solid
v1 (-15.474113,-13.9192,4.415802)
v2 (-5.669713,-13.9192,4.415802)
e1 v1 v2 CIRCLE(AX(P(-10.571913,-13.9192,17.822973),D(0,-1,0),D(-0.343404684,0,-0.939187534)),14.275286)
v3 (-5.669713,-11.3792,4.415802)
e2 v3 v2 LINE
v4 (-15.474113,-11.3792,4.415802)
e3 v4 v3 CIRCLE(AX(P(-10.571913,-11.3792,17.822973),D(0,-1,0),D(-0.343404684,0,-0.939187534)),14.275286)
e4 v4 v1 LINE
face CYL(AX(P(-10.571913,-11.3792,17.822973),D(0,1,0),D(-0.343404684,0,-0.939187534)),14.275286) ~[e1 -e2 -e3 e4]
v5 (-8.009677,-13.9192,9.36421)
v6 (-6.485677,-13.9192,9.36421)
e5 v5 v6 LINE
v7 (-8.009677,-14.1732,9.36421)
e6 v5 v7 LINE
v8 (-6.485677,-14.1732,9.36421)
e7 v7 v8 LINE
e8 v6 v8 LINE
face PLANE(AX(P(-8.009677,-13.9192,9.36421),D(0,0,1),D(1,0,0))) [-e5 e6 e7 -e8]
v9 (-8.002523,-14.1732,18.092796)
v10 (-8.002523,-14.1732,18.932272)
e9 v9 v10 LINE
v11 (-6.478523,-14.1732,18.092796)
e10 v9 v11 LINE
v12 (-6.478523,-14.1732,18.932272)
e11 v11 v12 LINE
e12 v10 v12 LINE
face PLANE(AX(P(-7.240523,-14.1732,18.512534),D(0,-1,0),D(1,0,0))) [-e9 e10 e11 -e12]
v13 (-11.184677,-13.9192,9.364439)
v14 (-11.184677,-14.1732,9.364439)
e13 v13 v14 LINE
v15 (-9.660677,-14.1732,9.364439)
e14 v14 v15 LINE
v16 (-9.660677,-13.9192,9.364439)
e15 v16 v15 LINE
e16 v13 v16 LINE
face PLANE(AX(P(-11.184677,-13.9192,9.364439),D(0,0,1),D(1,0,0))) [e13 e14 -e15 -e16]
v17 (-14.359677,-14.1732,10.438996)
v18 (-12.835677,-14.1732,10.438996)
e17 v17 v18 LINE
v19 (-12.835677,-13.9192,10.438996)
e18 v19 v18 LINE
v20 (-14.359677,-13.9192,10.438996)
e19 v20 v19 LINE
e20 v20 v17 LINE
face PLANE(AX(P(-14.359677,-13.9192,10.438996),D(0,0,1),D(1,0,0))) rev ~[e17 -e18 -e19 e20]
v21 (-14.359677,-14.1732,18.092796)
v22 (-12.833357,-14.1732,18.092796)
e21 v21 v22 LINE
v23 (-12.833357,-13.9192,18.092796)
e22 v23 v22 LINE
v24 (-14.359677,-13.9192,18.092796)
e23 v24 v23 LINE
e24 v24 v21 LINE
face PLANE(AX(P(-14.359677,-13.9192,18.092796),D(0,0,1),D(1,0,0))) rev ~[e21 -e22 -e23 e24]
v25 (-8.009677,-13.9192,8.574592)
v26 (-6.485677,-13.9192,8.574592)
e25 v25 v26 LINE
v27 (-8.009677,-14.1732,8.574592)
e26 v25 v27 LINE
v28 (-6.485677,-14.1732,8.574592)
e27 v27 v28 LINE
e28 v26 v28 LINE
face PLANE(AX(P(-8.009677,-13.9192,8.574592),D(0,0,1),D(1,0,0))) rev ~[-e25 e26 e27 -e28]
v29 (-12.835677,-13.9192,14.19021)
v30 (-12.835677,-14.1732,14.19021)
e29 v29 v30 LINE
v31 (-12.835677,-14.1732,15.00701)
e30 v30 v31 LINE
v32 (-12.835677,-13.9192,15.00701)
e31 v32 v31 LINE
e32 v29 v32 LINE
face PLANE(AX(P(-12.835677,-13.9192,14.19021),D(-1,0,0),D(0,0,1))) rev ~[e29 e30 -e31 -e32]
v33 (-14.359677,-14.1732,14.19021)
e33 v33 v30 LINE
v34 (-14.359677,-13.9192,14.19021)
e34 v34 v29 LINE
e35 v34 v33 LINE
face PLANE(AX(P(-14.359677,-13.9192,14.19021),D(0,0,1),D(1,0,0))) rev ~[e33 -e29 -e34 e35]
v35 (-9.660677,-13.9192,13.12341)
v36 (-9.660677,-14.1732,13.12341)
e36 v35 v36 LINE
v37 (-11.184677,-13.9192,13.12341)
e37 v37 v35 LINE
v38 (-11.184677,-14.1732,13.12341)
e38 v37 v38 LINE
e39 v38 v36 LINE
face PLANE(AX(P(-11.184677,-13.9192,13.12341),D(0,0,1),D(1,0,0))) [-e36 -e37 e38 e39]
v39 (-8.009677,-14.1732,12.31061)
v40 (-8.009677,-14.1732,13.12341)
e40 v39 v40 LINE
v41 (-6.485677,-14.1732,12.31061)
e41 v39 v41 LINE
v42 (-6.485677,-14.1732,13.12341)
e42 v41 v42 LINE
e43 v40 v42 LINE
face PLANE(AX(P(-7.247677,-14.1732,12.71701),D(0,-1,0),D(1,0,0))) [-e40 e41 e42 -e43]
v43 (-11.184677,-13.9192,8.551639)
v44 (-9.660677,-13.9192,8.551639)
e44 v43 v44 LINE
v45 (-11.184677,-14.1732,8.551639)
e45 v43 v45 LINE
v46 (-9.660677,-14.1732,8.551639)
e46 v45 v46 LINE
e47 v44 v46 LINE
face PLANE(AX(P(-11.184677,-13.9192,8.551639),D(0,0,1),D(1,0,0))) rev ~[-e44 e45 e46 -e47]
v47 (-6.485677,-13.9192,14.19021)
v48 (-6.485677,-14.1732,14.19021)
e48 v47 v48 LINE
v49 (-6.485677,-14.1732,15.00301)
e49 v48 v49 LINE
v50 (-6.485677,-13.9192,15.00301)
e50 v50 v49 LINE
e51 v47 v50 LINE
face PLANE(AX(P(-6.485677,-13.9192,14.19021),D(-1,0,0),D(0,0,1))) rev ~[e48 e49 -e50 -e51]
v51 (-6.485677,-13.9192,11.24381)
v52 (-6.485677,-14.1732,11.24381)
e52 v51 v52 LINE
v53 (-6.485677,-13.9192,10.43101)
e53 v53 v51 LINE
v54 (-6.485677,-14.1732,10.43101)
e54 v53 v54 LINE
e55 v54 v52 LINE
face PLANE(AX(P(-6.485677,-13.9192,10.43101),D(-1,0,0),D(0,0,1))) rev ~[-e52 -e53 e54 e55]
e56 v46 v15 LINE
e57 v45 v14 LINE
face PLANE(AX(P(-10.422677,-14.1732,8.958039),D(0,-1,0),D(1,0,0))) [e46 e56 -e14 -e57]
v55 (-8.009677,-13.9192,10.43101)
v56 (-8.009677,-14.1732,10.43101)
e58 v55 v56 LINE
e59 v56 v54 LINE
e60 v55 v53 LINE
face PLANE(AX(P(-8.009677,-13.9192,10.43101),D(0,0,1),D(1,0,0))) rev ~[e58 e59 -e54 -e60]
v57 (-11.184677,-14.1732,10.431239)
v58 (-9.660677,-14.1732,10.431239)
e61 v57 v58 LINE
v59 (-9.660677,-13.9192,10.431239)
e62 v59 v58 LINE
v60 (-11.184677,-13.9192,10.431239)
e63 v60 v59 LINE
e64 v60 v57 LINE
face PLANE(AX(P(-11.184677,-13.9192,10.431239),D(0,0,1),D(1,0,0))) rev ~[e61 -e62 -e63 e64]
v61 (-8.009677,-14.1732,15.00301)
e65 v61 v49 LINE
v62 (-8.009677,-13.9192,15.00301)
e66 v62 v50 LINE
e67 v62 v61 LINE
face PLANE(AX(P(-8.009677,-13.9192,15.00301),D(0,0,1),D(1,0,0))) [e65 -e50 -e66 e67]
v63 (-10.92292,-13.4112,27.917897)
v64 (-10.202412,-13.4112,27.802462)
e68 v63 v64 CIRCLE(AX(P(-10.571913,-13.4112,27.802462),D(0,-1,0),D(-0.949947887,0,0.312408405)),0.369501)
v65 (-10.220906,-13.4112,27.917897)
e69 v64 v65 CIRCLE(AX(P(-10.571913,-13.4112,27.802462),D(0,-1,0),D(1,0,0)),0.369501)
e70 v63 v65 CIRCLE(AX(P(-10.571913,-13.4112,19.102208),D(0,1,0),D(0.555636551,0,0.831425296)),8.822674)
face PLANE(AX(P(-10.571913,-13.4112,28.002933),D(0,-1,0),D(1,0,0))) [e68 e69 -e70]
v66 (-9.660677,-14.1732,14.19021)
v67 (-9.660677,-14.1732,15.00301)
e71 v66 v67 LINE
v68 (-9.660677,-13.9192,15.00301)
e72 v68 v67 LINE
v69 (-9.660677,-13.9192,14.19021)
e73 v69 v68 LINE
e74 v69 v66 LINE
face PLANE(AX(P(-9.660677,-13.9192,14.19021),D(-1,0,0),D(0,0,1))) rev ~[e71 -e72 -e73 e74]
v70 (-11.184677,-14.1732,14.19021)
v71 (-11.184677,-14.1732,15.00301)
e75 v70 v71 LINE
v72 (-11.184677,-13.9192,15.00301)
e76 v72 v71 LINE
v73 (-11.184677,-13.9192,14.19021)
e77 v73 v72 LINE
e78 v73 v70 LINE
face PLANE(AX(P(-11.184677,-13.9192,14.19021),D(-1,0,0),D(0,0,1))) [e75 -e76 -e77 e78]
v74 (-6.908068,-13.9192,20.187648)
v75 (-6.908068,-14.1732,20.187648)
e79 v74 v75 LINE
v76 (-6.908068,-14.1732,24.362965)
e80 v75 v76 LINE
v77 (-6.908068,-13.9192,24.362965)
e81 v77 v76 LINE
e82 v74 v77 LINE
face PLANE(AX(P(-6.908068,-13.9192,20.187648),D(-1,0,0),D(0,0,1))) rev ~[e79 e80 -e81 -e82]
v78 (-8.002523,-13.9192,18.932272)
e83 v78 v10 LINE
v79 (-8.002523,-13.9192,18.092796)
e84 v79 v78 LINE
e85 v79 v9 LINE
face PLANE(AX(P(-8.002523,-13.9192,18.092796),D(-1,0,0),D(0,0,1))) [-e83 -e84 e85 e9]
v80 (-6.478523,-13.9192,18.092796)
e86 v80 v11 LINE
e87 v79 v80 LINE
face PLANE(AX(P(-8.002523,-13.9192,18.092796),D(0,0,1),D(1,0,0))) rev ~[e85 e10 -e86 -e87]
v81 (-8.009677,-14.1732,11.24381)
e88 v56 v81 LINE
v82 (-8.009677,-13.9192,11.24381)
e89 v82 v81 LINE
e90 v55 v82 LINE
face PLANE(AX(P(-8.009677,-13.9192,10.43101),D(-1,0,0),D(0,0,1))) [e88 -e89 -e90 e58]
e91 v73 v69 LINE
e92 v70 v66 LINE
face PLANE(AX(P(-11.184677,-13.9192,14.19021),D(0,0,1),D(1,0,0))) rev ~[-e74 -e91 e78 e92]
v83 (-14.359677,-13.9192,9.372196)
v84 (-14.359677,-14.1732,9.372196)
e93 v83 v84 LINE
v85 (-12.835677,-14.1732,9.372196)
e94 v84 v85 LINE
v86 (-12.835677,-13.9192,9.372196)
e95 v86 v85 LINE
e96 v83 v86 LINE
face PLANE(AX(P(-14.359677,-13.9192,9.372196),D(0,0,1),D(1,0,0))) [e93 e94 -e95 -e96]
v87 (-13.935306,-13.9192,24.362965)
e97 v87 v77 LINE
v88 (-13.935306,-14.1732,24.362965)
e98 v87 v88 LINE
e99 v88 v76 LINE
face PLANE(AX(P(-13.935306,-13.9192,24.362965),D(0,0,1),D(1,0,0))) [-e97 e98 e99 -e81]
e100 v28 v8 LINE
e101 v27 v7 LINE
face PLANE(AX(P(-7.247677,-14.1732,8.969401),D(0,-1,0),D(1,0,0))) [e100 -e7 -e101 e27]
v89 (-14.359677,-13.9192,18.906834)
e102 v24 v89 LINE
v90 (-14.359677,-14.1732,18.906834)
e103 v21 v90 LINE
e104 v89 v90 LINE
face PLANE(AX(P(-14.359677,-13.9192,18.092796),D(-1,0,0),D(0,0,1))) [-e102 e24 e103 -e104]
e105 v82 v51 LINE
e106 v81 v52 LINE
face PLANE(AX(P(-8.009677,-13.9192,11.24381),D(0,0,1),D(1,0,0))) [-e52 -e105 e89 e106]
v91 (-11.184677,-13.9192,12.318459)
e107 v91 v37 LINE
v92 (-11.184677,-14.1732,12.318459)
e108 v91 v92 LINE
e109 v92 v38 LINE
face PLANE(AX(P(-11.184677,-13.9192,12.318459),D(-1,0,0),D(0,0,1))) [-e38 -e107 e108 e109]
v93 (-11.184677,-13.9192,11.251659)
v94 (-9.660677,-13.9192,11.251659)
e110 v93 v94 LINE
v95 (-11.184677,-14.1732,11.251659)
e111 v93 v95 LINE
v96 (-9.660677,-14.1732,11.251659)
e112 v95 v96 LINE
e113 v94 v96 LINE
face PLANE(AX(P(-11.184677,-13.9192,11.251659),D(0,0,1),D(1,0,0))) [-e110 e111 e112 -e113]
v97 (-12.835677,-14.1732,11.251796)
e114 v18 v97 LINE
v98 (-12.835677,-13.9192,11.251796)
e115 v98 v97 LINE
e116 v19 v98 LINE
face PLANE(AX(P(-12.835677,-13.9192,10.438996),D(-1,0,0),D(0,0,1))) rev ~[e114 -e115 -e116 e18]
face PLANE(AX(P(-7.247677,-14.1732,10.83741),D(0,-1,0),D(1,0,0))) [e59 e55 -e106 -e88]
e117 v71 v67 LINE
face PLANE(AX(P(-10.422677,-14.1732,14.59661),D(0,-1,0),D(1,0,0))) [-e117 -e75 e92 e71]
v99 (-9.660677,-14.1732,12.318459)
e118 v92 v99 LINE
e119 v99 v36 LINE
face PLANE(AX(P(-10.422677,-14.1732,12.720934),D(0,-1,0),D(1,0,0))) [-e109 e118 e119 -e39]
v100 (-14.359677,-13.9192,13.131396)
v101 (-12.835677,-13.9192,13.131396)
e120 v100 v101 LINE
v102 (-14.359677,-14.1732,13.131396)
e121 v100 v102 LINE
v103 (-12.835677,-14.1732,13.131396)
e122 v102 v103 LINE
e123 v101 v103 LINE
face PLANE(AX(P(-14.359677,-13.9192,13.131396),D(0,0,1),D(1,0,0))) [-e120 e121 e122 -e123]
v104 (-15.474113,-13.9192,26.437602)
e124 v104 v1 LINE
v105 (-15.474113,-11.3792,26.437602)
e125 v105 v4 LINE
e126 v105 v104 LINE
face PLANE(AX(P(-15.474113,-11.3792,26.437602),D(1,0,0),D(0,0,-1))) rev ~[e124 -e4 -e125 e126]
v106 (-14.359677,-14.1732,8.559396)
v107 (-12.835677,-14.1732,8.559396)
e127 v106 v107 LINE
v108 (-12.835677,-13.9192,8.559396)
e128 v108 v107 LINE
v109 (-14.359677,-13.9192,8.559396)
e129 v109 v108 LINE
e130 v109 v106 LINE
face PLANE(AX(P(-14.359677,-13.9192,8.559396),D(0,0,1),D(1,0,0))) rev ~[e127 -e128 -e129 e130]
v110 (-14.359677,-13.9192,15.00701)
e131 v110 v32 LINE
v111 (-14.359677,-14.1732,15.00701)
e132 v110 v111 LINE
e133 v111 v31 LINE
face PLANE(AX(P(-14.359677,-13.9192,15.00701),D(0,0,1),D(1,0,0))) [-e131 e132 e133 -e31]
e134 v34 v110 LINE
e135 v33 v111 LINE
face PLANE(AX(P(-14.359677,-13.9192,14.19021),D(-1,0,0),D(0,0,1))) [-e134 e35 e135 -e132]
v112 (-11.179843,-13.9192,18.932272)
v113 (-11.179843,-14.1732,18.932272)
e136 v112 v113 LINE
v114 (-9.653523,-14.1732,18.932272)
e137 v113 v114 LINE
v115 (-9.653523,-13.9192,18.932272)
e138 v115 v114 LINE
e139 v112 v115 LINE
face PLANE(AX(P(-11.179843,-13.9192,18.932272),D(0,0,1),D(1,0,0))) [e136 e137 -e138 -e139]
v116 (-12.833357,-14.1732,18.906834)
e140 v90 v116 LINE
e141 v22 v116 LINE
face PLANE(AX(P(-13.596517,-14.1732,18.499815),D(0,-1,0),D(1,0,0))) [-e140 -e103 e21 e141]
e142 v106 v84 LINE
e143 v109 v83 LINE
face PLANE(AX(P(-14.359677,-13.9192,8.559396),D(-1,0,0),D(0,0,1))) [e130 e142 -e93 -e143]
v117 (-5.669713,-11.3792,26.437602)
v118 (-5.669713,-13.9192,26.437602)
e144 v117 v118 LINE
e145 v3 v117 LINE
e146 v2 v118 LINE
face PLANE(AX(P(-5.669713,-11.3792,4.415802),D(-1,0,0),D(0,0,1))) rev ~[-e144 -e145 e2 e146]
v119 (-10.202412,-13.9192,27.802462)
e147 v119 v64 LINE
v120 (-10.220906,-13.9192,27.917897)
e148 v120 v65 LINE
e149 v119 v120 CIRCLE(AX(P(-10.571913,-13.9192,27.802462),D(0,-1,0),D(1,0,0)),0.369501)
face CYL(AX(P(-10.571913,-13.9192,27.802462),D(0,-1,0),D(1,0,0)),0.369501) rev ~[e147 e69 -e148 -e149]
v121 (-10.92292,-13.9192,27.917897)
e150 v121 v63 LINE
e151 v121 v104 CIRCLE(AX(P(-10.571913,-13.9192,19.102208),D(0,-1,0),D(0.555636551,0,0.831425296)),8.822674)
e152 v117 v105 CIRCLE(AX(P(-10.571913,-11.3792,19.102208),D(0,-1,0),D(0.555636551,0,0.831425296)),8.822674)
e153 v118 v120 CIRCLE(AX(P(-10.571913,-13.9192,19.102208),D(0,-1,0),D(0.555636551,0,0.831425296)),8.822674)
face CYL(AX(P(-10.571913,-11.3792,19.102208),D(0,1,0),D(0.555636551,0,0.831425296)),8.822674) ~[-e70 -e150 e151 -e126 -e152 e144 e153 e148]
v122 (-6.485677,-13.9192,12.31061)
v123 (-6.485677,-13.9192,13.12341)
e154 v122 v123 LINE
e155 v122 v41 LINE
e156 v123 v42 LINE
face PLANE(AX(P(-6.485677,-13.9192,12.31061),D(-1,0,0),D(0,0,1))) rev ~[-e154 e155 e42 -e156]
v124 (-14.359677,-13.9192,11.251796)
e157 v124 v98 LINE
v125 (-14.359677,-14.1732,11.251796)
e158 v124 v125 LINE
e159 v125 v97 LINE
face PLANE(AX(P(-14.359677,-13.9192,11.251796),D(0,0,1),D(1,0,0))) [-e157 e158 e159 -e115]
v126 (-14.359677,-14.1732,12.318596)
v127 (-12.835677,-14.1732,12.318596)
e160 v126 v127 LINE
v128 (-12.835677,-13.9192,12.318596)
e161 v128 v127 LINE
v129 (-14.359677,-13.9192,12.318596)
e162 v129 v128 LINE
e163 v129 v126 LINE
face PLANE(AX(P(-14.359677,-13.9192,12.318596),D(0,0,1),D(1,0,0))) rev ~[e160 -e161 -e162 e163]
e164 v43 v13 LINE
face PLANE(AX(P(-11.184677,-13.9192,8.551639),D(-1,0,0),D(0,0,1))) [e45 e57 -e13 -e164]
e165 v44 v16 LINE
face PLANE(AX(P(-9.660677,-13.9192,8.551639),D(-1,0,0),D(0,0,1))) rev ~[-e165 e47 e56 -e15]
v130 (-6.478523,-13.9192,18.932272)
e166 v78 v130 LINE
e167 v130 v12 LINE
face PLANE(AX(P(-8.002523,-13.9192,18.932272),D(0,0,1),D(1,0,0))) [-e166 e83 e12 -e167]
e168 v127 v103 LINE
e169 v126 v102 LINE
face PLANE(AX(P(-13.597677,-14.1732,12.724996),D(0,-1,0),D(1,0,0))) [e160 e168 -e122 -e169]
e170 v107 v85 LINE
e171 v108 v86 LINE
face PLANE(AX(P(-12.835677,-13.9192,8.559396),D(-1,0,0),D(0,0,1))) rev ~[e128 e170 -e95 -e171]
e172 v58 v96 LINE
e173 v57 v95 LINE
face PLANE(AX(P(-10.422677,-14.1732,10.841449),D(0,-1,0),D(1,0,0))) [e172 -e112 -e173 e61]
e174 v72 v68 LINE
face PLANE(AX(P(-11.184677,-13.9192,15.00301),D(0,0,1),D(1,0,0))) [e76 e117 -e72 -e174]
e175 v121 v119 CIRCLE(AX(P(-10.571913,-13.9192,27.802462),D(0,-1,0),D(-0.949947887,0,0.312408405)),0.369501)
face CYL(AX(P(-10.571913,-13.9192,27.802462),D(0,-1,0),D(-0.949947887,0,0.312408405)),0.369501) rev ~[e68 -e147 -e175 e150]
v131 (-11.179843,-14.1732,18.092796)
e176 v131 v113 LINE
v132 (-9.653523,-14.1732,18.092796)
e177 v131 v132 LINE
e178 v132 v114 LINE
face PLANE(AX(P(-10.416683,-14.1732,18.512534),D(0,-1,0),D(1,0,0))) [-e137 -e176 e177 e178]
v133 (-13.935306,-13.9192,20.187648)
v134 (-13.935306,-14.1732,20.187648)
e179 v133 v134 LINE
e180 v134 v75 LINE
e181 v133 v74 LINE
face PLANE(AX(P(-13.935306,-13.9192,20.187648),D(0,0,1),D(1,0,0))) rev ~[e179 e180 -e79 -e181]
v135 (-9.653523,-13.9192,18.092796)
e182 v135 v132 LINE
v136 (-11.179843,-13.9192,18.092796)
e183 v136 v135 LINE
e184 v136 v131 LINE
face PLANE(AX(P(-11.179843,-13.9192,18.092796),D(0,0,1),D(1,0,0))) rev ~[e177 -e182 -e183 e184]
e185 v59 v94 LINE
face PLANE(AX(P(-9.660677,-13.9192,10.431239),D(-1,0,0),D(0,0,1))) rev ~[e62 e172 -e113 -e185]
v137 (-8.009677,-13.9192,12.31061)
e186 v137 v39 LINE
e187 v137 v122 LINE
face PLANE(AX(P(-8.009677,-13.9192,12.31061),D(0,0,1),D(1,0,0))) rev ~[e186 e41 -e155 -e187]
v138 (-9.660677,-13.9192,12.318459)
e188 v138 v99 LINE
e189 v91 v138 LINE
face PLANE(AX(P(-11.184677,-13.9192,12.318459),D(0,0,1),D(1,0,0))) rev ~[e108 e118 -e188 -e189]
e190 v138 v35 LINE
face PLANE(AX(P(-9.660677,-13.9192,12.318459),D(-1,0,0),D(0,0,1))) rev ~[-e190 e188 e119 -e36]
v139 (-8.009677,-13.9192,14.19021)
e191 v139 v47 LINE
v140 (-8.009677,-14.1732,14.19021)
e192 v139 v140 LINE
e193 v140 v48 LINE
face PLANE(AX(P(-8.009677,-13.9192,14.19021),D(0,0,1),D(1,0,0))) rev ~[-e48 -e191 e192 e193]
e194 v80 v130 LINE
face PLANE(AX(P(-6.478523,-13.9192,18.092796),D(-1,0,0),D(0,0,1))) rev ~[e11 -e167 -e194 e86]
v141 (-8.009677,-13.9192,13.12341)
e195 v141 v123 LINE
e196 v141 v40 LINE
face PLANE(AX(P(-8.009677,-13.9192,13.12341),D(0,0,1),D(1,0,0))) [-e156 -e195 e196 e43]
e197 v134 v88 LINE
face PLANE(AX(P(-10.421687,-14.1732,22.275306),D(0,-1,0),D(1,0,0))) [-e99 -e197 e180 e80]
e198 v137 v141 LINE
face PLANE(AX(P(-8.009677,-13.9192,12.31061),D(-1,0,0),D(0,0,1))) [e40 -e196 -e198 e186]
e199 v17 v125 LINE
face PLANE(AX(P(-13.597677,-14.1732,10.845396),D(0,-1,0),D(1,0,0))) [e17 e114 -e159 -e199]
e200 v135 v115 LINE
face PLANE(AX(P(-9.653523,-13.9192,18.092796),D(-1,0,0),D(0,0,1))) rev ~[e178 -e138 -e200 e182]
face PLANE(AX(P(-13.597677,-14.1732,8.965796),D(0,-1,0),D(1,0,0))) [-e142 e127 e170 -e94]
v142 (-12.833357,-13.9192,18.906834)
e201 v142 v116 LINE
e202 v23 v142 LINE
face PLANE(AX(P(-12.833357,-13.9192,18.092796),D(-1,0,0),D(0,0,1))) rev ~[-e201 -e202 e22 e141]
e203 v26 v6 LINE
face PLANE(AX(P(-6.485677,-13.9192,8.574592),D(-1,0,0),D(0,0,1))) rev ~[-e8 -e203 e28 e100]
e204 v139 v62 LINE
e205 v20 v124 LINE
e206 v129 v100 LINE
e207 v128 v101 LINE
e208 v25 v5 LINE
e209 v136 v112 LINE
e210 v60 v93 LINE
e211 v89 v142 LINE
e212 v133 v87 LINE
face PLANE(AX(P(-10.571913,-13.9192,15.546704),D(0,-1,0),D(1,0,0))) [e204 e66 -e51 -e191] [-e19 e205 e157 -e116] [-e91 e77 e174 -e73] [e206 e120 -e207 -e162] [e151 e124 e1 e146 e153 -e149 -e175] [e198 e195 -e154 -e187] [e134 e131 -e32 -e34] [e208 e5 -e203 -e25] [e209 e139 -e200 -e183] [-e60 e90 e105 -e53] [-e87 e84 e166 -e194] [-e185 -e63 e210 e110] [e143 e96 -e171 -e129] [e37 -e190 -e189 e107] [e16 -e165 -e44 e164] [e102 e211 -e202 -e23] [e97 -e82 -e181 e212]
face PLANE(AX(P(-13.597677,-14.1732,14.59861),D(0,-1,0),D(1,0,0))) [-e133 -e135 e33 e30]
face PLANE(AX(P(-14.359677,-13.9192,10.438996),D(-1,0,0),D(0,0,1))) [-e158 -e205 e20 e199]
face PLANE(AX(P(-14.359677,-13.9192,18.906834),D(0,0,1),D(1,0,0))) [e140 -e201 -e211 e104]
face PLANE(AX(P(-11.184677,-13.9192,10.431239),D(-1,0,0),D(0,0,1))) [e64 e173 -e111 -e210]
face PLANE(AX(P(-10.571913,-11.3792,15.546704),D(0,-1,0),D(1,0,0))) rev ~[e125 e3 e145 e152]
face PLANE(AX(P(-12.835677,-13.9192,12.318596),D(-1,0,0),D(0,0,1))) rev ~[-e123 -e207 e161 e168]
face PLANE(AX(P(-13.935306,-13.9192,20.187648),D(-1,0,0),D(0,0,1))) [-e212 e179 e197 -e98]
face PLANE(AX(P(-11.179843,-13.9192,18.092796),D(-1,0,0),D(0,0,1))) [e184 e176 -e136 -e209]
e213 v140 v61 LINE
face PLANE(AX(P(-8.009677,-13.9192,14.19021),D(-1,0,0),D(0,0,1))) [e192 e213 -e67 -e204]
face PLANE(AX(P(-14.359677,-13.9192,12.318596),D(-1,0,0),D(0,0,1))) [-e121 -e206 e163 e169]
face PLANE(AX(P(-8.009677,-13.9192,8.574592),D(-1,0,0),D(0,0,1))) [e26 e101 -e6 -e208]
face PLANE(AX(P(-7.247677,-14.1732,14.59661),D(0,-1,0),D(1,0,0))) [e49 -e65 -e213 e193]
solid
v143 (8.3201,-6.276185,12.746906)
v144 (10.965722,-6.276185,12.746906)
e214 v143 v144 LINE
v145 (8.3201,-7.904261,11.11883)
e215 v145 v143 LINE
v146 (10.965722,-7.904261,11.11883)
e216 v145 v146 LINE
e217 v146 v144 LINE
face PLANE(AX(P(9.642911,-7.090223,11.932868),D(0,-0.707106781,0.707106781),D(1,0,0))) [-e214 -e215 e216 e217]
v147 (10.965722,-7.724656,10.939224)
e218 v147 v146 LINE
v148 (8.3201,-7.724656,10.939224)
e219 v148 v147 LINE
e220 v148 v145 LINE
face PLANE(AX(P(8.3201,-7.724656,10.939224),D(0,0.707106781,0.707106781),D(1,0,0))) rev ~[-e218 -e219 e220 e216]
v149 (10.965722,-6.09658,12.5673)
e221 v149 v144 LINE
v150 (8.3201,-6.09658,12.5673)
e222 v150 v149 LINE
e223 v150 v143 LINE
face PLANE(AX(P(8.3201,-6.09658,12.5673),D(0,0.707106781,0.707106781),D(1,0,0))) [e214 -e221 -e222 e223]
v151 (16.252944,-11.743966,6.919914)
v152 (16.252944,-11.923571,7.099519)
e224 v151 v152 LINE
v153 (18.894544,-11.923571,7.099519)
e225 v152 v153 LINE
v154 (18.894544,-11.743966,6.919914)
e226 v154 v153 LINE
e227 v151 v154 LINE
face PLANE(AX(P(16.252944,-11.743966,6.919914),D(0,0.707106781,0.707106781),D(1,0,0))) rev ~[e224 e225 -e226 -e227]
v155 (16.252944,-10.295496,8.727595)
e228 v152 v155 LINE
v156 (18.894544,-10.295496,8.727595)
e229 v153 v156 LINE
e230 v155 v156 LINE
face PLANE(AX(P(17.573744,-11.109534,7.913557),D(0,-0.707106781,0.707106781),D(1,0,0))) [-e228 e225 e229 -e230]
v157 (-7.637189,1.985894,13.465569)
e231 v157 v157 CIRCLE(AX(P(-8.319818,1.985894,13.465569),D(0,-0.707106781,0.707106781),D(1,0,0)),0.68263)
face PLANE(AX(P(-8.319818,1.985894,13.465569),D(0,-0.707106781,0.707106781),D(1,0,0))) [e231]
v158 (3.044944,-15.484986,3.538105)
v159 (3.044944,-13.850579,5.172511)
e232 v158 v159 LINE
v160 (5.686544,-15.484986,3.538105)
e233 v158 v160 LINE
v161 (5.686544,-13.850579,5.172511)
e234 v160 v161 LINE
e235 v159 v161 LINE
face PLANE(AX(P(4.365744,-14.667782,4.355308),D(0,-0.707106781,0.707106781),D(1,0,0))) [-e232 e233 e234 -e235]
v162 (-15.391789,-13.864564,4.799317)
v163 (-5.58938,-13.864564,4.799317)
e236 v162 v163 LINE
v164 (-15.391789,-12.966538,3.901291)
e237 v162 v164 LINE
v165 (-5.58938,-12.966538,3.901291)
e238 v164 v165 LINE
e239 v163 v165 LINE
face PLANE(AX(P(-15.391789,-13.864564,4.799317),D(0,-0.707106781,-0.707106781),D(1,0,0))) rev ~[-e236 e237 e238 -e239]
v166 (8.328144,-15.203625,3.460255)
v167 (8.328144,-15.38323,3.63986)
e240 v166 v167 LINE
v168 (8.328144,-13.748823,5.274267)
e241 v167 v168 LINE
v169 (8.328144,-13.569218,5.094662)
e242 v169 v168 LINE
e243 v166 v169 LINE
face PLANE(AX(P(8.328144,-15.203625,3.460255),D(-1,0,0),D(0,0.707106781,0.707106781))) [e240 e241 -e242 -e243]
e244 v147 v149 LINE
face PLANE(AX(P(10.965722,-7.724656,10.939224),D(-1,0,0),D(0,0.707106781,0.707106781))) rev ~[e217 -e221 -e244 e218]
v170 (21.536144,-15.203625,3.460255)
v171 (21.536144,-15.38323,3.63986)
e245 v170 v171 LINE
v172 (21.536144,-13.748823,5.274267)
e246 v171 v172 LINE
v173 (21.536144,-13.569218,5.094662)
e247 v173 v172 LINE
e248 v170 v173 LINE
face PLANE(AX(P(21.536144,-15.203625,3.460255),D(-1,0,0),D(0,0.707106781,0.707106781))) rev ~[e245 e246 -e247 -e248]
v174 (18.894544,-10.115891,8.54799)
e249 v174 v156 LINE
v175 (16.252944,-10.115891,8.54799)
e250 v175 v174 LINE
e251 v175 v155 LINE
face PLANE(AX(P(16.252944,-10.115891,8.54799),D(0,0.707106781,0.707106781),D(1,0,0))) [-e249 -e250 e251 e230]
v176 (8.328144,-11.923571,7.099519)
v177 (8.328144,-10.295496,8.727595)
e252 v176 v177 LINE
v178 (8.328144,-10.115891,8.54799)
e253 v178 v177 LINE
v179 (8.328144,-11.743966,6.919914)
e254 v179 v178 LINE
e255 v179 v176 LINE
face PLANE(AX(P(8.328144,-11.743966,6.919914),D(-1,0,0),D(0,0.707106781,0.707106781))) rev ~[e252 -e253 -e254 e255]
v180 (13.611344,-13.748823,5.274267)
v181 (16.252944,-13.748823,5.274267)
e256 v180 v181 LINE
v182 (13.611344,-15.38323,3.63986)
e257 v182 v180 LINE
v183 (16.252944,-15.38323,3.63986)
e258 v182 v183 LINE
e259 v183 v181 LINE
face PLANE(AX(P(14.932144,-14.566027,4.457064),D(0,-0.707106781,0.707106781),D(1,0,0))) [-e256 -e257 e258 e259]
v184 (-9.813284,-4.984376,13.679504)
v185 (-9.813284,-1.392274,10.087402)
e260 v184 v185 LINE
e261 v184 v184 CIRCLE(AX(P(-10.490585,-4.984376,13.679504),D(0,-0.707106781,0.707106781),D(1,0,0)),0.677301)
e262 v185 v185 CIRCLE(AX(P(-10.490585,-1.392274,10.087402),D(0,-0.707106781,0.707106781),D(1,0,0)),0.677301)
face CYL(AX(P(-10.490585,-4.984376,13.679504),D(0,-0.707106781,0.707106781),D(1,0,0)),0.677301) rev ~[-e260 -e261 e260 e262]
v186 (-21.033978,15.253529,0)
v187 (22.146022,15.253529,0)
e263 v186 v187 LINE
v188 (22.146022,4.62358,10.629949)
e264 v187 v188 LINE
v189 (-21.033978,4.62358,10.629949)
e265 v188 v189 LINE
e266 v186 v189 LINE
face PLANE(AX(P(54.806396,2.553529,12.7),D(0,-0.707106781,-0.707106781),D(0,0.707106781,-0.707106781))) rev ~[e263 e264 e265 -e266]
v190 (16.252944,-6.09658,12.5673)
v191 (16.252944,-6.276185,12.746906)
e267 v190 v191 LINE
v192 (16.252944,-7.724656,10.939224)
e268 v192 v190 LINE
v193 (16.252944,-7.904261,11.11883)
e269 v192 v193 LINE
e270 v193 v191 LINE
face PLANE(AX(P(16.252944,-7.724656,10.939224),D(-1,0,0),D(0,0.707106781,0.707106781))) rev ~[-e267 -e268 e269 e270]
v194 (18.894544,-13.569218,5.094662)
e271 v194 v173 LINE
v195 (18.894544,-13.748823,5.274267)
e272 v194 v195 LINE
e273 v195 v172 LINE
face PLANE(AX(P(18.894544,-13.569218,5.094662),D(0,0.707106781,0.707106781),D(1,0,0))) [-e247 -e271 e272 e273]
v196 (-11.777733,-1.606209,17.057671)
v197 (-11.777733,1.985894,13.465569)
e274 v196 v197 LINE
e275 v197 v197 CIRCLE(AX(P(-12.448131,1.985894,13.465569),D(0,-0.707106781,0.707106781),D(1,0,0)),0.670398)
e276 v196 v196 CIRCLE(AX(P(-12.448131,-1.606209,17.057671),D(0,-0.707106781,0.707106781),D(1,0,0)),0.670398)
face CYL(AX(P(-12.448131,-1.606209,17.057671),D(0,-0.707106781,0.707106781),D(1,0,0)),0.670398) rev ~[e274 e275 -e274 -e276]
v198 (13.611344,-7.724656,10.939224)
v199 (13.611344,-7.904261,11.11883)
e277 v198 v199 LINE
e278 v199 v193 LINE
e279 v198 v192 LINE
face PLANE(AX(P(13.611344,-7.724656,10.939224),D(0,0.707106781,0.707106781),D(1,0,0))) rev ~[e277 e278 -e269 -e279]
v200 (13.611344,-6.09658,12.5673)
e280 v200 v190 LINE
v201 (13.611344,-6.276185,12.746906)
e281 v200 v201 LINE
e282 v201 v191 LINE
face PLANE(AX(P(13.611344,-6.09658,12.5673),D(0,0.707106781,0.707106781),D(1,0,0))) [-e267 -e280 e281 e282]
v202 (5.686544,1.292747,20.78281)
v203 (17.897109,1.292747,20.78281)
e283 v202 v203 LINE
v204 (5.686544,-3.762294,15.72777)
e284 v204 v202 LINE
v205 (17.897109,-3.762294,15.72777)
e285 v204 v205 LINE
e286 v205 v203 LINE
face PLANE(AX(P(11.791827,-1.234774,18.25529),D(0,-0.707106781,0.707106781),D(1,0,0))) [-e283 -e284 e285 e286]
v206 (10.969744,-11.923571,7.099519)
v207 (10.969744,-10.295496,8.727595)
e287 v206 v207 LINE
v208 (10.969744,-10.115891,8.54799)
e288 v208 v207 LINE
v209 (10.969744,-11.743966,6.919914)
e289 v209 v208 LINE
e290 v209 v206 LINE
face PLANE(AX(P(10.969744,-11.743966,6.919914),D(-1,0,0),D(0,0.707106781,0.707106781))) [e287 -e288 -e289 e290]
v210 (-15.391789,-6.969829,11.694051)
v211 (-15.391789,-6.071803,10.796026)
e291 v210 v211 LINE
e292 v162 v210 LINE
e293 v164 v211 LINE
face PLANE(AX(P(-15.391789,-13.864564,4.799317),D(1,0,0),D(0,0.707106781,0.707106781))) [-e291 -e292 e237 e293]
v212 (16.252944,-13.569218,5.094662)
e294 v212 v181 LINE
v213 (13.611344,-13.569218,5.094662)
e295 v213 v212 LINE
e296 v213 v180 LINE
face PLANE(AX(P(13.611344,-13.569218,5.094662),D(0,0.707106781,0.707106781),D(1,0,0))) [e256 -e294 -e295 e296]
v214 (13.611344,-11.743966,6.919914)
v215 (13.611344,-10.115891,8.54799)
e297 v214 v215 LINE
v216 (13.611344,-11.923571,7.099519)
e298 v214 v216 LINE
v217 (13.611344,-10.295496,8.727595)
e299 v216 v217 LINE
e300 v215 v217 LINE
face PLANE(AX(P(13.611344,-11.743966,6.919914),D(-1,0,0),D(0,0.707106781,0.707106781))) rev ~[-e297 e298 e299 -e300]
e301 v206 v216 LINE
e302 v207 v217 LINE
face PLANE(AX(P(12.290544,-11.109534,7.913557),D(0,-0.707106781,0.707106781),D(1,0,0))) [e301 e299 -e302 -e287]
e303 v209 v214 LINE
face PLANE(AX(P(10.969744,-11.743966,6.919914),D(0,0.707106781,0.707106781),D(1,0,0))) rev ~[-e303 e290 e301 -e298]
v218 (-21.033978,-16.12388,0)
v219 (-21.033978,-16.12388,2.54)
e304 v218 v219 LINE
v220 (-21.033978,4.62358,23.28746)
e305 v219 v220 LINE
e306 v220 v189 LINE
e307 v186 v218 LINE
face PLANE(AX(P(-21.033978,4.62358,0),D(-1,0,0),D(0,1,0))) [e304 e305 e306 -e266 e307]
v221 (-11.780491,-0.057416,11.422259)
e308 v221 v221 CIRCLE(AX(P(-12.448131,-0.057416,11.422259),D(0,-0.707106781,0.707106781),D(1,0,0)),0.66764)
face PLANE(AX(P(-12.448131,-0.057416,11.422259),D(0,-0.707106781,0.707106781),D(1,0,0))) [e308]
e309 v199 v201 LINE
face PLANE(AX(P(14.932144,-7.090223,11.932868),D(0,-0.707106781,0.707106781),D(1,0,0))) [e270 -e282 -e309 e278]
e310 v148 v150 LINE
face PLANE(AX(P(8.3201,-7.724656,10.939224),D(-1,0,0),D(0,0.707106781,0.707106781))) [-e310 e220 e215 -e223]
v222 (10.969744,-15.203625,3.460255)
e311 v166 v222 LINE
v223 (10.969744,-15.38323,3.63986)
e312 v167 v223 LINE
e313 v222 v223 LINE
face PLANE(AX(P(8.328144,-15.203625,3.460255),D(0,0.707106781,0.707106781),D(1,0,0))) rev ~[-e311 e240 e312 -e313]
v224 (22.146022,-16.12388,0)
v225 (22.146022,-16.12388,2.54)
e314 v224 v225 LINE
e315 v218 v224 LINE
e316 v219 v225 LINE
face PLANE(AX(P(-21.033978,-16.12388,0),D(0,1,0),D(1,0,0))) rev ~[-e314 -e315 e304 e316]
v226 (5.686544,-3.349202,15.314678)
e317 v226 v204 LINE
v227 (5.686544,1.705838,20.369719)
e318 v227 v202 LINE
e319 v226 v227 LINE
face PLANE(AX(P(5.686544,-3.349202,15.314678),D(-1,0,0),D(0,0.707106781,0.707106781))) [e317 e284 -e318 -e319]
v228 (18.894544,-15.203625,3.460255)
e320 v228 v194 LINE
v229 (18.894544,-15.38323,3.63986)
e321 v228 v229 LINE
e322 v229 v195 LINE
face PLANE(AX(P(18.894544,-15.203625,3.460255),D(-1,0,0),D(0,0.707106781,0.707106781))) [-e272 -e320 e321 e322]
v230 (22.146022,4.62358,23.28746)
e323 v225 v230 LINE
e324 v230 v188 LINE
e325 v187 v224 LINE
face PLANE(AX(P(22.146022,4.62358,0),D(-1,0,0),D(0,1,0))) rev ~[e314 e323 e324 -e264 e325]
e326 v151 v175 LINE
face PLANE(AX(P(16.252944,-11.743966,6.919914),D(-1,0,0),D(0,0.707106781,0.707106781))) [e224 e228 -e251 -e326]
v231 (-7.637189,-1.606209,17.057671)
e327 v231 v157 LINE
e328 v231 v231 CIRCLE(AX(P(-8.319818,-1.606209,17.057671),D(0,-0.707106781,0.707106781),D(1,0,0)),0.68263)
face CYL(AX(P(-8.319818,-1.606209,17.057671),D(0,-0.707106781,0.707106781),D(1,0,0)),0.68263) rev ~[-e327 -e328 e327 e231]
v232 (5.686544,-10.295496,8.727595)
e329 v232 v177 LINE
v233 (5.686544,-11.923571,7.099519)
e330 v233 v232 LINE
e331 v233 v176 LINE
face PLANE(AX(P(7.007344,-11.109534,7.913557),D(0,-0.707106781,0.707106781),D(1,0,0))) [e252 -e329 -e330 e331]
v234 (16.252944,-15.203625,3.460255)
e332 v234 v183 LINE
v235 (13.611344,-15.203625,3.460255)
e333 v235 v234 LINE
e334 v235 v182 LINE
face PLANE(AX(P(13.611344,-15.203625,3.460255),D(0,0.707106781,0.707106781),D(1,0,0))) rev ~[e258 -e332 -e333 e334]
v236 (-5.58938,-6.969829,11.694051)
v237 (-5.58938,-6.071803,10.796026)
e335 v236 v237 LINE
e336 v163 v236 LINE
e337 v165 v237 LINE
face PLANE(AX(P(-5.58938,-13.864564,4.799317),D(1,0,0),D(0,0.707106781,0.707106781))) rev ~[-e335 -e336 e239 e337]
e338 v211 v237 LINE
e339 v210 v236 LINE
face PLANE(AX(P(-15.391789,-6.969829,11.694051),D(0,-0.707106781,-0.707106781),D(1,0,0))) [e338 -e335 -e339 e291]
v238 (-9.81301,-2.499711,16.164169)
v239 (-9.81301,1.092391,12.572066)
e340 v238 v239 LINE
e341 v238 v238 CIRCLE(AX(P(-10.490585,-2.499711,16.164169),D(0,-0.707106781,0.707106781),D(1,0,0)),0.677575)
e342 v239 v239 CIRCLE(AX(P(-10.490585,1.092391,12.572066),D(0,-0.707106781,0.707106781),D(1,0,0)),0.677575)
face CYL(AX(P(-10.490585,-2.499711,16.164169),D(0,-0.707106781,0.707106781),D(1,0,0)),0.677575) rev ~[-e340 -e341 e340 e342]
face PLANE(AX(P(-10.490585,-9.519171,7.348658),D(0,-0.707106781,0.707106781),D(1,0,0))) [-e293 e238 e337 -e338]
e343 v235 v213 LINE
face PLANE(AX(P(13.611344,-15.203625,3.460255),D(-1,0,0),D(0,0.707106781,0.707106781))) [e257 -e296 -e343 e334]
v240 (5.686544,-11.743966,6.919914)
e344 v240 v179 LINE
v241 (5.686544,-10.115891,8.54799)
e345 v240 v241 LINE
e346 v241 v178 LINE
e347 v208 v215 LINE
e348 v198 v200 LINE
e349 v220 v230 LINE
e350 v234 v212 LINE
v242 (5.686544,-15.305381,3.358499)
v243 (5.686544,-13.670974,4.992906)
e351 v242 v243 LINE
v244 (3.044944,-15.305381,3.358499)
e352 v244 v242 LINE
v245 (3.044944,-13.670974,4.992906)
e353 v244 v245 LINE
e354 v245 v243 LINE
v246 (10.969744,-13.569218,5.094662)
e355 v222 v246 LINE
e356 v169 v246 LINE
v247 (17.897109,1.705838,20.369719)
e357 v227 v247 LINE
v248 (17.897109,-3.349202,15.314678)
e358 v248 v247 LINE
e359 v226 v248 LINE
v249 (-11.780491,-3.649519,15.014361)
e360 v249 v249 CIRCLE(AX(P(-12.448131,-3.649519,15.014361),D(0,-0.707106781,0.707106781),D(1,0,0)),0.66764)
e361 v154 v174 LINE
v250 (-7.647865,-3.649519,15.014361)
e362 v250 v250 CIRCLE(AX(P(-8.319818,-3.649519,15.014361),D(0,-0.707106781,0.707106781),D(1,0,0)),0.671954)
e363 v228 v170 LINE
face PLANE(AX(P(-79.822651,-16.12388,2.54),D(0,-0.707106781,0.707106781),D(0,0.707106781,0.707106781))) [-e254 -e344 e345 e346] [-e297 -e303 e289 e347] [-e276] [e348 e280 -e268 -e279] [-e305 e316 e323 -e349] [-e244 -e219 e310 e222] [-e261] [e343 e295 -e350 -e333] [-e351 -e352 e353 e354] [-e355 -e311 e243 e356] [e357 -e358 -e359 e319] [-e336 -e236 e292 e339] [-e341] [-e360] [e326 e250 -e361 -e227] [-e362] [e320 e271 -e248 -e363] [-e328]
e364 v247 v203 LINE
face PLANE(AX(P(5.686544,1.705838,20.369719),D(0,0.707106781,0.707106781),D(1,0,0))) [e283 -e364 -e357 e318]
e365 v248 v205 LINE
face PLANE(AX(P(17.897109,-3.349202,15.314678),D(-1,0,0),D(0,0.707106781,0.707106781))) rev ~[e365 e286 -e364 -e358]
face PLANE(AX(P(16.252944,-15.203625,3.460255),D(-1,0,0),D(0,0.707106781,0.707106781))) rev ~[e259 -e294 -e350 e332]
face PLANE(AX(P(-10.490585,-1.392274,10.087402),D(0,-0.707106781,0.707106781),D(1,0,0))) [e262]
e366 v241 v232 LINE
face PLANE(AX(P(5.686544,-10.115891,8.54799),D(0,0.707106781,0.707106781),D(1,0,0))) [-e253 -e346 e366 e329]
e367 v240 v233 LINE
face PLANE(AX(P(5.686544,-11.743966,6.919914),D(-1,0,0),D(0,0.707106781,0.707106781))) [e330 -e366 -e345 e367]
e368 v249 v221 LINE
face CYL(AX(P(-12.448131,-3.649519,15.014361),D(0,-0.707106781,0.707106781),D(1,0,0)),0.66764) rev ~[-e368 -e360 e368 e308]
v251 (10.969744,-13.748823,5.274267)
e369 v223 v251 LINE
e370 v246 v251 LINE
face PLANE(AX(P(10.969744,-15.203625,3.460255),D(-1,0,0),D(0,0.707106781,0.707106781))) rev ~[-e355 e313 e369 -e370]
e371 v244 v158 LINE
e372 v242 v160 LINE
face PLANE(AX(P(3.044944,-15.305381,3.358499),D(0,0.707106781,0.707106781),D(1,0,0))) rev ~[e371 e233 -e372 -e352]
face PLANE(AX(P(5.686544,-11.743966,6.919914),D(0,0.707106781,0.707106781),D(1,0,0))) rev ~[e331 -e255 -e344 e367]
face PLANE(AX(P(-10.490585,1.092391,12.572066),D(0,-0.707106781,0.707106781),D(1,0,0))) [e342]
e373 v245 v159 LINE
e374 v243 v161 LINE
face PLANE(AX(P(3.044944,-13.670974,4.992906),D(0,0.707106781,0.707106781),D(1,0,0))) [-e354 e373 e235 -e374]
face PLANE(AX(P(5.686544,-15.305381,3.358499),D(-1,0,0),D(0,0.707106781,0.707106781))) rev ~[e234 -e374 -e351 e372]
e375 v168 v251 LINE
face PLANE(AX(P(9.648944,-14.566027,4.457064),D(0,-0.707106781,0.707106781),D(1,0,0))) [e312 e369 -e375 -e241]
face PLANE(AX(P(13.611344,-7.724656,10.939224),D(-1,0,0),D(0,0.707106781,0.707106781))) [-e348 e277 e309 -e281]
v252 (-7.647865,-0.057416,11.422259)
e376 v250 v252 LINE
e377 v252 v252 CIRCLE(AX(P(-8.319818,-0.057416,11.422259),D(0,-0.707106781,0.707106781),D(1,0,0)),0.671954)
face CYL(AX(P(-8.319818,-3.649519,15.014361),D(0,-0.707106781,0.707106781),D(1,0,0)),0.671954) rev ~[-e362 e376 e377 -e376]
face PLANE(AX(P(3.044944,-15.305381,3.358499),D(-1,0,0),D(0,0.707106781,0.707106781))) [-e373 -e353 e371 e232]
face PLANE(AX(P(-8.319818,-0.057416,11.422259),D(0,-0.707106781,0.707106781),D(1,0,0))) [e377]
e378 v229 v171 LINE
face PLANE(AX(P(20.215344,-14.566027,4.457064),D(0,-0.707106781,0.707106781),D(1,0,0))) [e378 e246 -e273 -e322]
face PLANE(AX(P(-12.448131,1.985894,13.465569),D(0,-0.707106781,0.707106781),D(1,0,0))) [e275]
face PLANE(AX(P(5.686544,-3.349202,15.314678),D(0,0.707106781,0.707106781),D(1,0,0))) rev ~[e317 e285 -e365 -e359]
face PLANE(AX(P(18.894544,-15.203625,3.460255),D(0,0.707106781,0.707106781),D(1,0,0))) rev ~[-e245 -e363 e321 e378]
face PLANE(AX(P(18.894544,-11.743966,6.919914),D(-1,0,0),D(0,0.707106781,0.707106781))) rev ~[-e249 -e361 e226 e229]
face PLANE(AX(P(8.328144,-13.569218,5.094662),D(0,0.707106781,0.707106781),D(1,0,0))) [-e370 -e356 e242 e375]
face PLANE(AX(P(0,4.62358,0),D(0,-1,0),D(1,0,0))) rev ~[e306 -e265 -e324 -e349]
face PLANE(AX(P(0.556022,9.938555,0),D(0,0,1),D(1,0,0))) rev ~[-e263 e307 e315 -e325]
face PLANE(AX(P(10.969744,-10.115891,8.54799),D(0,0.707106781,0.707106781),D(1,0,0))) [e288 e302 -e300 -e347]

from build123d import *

# Parameters (mm, degrees)
F0_W        = 43.18
F0_H        = 20.7474600966
F1_DEPTH    = 25.4
F0_H_2      = 10.629949436
F2_DEPTH    = 12.7
F3_T1_DEPTH = 160.7573462098
F4_T4_DEPTH = 108.5007478943
F5_W        = 9.8024089821
F5_H        = 9.7506272141
F6_DEPTH    = 1.27
F7_W        = 2.6456220075
F7_H        = 2.3024471011
F7_W_2      = 2.6416
F7_H_2      = 2.3024467519
F7_H_3      = 2.3114
F8_DEPTH    = 0.254
F7_W_3      = 12.2105642222
F7_H_4      = 7.1489069227
F9_DEPTH    = 0.5842
F11_DEPTH   = 2.54
F13_W       = 1.524
F13_H       = 0.8168006316
F13_H_2     = 0.8128
F13_H_3     = 0.8049504831
F13_H_4     = 0.82042
F13_H_5     = 0.7896171883
F13_W_2     = 1.5263203532
F13_H_6     = 0.8140373975
F13_H_7     = 0.8394755423
F13_W_3     = 7.0272386074
F13_H_8     = 4.1753165424
F14_DEPTH   = 0.254
F15_DEPTH   = 0.508
F16_R       = 0.6775746303
F16_R_2     = 0.6719535835
F16_R_3     = 0.6676399197
F16_R_4     = 0.6773005459
F16_R_5     = 0.6826296901
F16_R_6     = 0.6703978175
F17_DEPTH   = 5.08


# Not quite as in the source:
# - a fillet or chamfer that OpenCascade refuses, or shapes differently, is made with other operations: its cross-section is extruded or revolved along the edge and cut away or added
# - a feature names something its author has since deleted; it is built from what else it names


with BuildPart() as f1:
    # F0 (on Top) → F1 (new body)
    with BuildSketch(Plane.XY):
        with Locations((0.5560219288, -5.7501500921)):
            Rectangle(F0_W, F0_H)
    extrude(amount=F1_DEPTH)

    # F0 (on Top) → F2 (join)
    with BuildSketch(Plane.XY):
        with Locations((0.5560219288, 9.9385546742)):
            Rectangle(F0_W, F0_H_2)
    extrude(amount=F2_DEPTH)

    # F3: chamfer of 22.86 on 1 edges, made by hand

    # F3_s2 → F3_t1 (cut)
    with BuildSketch(Plane.YZ.offset(-79.8226511761)):
        Polygon((-16.1238801405, 2.54), (6.7361198595, 25.4), (-16.1238801405, 25.4), align=None)
    extrude(amount=F3_T1_DEPTH, mode=Mode.SUBTRACT)

    # F4: chamfer of 12.7 on 1 edges, made by hand


with BuildPart() as f4_tool2:
    # F4_s3 → F4_t4 (new body)
    with BuildSketch(Plane.YZ.offset(54.806395876)):
        Polygon((2.5535293922, 12.7), (15.2535293922, 0), (15.2535293922, 12.7), align=None)
    extrude(amount=-F4_T4_DEPTH)

    split(bisect_by=Plane.XZ.offset(-4.6235799562), keep=Keep.BOTTOM)


with BuildPart() as f1_1:
    add(f1.part)

    # F4_t1: cut F4_tool2
    add(f4_tool2.part, mode=Mode.SUBTRACT)

    # F5 (on face) → F6 (cut)
    with BuildSketch(Plane(origin=(0, -9.3319400702, 9.3319400702), x_dir=(1, 0, 0), z_dir=(0, -0.7071067812, 0.7071067812))):
        with Locations((-10.4905848857, -1.5347840963)):
            Rectangle(F5_W, F5_H)
    extrude(amount=-F6_DEPTH, mode=Mode.SUBTRACT)

    # F7 (on face) → F8 (join)
    with BuildSketch(Plane(origin=(0, -9.3319400702, 9.3319400702), x_dir=(1, 0, 0), z_dir=(0, -0.7071067812, 0.7071067812))):
        with Locations((9.6429114781, 3.4242669353)):
            Rectangle(F7_W, F7_H)
        with Locations((14.9321444894, 3.4242669353)):
            Rectangle(F7_W_2, F7_H)
        with Locations((7.0073444894, -2.2598968935)):
            Rectangle(F7_W_2, F7_H_2)
        with Locations((12.2905444894, -2.2598968935)):
            Rectangle(F7_W_2, F7_H_2)
        with Locations((17.5737444894, -2.2598968935)):
            Rectangle(F7_W_2, F7_H_2)
        with Locations((4.3657444894, -7.2920206692)):
            Rectangle(F7_W_2, F7_H_3)
        with Locations((9.6489444894, -7.1481164303)):
            Rectangle(F7_W_2, F7_H_3)
        with Locations((14.9321444894, -7.1481164303)):
            Rectangle(F7_W_2, F7_H_3)
        with Locations((20.2153444894, -7.1481164303)):
            Rectangle(F7_W_2, F7_H_3)
    extrude(amount=F8_DEPTH)

    # F7 (on face) → F9 (join)
    with BuildSketch(Plane(origin=(0, -9.3319400702, 9.3319400702), x_dir=(1, 0, 0), z_dir=(0, -0.7071067812, 0.7071067812))):
        with Locations((11.7918266005, 12.0353225427)):
            Rectangle(F7_W_3, F7_H_4)
    extrude(amount=F9_DEPTH)

    # F16 (on face) → F17 (cut)
    with BuildSketch(Plane(origin=(0, -9.3319400702, 9.3319400702), x_dir=(1, 0, 0), z_dir=(0, -0.7071067812, 0.7071067812))):
        with Locations((-10.4905848857, 9.6622304991)):
            Circle(F16_R)
        with Locations((-8.3198184147, 8.0361571163)):
            Circle(F16_R_2)
        with Locations((-12.4481311068, 8.0361571163)):
            Circle(F16_R_3)
        with Locations((-10.4905848857, 6.1483839527)):
            Circle(F16_R_4)
        with Locations((-8.3198184147, 10.9258340672)):
            Circle(F16_R_5)
        with Locations((-12.4481311068, 10.9258340672)):
            Circle(F16_R_6)
    extrude(amount=-F17_DEPTH, mode=Mode.SUBTRACT)


with BuildPart() as f11:
    # F10 (on Front) → F11 (new body)
    with BuildSketch(Plane.XZ):
        with BuildLine():
            ThreePointArc((49.9308869097, 22.6276024803), (45.0286869097, 24.1148820906), (40.1264869097, 22.6276024803))
            Line((40.1264869097, 22.6276024803), (40.1264869097, 0.6058024803))
            ThreePointArc((40.1264869097, 0.6058024803), (45.0286869097, -0.2623128577), (49.9308869097, 0.6058024803))
            Line((49.9308869097, 0.6058024803), (49.9308869097, 22.6276024803))
        make_face()
    extrude(amount=F11_DEPTH)


with BuildPart() as f11_1:
    # F12: moved
    add(f11.part.moved(Location((-55.6006, -11.3792, 3.81))))

    # F13 (on face) → F14 (join)
    with BuildSketch(Plane.XZ.offset(13.9192)):
        with Locations((-13.5976772105, 14.5986099907)):
            Rectangle(F13_W, F13_H)
        with Locations((-10.4226772105, 14.596609675)):
            Rectangle(F13_W, F13_H_2)
        with Locations((-13.5976772105, 12.7249955591)):
            Rectangle(F13_W, F13_H_2)
        with Locations((-10.4226772105, 12.7209344334)):
            Rectangle(F13_W, F13_H_3)
        with Locations((-7.2476772105, 12.717009675)):
            Rectangle(F13_W, F13_H_2)
        with Locations((-7.2476772105, 14.596609675)):
            Rectangle(F13_W, F13_H_2)
        with Locations((-10.4226772105, 10.8414491918)):
            Rectangle(F13_W, F13_H_4)
        with Locations((-7.2476772105, 10.837409675)):
            Rectangle(F13_W, F13_H_2)
        with Locations((-7.2476772105, 8.9694010808)):
            Rectangle(F13_W, F13_H_5)
        with Locations((-10.4226772105, 8.9580391918)):
            Rectangle(F13_W, F13_H_2)
        with Locations((-13.5976772105, 8.9657955591)):
            Rectangle(F13_W, F13_H_2)
        with Locations((-13.5976772105, 10.8453955591)):
            Rectangle(F13_W, F13_H_2)
        with Locations((-13.5965170339, 18.4998149052)):
            Rectangle(F13_W_2, F13_H_6)
        with Locations((-10.4166828096, 18.5125339776)):
            Rectangle(F13_W_2, F13_H_7)
        with Locations((-7.240522633, 18.5125339776)):
            Rectangle(F13_W, F13_H_7)
        with Locations((-10.4216868058, 22.2753062844)):
            Rectangle(F13_W_3, F13_H_8)
    extrude(amount=F14_DEPTH)

    # F13 (on face) → F15 (cut)
    with BuildSketch(Plane.XZ.offset(13.9192)):
        with BuildLine():
            ThreePointArc((-10.9229198271, 27.9178969903), (-10.5719130903, 27.9248820906), (-10.2209063536, 27.9178969903))
            ThreePointArc((-10.2209063536, 27.9178969903), (-10.5719130903, 28.171962803), (-10.9229198271, 27.9178969903))
        make_face()
        with BuildLine():
            ThreePointArc((-10.9229198271, 27.9178969903), (-10.6303667733, 27.4376135857), (-10.2024120456, 27.8024617583))
            ThreePointArc((-10.2024120456, 27.8024617583), (-10.2070649178, 27.8609154413), (-10.2209063536, 27.9178969903))
            ThreePointArc((-10.2209063536, 27.9178969903), (-10.5719130903, 27.9248820906), (-10.9229198271, 27.9178969903))
        make_face()
    extrude(amount=-F15_DEPTH, mode=Mode.SUBTRACT)


solid = Compound([f1_1.part, f11_1.part])
